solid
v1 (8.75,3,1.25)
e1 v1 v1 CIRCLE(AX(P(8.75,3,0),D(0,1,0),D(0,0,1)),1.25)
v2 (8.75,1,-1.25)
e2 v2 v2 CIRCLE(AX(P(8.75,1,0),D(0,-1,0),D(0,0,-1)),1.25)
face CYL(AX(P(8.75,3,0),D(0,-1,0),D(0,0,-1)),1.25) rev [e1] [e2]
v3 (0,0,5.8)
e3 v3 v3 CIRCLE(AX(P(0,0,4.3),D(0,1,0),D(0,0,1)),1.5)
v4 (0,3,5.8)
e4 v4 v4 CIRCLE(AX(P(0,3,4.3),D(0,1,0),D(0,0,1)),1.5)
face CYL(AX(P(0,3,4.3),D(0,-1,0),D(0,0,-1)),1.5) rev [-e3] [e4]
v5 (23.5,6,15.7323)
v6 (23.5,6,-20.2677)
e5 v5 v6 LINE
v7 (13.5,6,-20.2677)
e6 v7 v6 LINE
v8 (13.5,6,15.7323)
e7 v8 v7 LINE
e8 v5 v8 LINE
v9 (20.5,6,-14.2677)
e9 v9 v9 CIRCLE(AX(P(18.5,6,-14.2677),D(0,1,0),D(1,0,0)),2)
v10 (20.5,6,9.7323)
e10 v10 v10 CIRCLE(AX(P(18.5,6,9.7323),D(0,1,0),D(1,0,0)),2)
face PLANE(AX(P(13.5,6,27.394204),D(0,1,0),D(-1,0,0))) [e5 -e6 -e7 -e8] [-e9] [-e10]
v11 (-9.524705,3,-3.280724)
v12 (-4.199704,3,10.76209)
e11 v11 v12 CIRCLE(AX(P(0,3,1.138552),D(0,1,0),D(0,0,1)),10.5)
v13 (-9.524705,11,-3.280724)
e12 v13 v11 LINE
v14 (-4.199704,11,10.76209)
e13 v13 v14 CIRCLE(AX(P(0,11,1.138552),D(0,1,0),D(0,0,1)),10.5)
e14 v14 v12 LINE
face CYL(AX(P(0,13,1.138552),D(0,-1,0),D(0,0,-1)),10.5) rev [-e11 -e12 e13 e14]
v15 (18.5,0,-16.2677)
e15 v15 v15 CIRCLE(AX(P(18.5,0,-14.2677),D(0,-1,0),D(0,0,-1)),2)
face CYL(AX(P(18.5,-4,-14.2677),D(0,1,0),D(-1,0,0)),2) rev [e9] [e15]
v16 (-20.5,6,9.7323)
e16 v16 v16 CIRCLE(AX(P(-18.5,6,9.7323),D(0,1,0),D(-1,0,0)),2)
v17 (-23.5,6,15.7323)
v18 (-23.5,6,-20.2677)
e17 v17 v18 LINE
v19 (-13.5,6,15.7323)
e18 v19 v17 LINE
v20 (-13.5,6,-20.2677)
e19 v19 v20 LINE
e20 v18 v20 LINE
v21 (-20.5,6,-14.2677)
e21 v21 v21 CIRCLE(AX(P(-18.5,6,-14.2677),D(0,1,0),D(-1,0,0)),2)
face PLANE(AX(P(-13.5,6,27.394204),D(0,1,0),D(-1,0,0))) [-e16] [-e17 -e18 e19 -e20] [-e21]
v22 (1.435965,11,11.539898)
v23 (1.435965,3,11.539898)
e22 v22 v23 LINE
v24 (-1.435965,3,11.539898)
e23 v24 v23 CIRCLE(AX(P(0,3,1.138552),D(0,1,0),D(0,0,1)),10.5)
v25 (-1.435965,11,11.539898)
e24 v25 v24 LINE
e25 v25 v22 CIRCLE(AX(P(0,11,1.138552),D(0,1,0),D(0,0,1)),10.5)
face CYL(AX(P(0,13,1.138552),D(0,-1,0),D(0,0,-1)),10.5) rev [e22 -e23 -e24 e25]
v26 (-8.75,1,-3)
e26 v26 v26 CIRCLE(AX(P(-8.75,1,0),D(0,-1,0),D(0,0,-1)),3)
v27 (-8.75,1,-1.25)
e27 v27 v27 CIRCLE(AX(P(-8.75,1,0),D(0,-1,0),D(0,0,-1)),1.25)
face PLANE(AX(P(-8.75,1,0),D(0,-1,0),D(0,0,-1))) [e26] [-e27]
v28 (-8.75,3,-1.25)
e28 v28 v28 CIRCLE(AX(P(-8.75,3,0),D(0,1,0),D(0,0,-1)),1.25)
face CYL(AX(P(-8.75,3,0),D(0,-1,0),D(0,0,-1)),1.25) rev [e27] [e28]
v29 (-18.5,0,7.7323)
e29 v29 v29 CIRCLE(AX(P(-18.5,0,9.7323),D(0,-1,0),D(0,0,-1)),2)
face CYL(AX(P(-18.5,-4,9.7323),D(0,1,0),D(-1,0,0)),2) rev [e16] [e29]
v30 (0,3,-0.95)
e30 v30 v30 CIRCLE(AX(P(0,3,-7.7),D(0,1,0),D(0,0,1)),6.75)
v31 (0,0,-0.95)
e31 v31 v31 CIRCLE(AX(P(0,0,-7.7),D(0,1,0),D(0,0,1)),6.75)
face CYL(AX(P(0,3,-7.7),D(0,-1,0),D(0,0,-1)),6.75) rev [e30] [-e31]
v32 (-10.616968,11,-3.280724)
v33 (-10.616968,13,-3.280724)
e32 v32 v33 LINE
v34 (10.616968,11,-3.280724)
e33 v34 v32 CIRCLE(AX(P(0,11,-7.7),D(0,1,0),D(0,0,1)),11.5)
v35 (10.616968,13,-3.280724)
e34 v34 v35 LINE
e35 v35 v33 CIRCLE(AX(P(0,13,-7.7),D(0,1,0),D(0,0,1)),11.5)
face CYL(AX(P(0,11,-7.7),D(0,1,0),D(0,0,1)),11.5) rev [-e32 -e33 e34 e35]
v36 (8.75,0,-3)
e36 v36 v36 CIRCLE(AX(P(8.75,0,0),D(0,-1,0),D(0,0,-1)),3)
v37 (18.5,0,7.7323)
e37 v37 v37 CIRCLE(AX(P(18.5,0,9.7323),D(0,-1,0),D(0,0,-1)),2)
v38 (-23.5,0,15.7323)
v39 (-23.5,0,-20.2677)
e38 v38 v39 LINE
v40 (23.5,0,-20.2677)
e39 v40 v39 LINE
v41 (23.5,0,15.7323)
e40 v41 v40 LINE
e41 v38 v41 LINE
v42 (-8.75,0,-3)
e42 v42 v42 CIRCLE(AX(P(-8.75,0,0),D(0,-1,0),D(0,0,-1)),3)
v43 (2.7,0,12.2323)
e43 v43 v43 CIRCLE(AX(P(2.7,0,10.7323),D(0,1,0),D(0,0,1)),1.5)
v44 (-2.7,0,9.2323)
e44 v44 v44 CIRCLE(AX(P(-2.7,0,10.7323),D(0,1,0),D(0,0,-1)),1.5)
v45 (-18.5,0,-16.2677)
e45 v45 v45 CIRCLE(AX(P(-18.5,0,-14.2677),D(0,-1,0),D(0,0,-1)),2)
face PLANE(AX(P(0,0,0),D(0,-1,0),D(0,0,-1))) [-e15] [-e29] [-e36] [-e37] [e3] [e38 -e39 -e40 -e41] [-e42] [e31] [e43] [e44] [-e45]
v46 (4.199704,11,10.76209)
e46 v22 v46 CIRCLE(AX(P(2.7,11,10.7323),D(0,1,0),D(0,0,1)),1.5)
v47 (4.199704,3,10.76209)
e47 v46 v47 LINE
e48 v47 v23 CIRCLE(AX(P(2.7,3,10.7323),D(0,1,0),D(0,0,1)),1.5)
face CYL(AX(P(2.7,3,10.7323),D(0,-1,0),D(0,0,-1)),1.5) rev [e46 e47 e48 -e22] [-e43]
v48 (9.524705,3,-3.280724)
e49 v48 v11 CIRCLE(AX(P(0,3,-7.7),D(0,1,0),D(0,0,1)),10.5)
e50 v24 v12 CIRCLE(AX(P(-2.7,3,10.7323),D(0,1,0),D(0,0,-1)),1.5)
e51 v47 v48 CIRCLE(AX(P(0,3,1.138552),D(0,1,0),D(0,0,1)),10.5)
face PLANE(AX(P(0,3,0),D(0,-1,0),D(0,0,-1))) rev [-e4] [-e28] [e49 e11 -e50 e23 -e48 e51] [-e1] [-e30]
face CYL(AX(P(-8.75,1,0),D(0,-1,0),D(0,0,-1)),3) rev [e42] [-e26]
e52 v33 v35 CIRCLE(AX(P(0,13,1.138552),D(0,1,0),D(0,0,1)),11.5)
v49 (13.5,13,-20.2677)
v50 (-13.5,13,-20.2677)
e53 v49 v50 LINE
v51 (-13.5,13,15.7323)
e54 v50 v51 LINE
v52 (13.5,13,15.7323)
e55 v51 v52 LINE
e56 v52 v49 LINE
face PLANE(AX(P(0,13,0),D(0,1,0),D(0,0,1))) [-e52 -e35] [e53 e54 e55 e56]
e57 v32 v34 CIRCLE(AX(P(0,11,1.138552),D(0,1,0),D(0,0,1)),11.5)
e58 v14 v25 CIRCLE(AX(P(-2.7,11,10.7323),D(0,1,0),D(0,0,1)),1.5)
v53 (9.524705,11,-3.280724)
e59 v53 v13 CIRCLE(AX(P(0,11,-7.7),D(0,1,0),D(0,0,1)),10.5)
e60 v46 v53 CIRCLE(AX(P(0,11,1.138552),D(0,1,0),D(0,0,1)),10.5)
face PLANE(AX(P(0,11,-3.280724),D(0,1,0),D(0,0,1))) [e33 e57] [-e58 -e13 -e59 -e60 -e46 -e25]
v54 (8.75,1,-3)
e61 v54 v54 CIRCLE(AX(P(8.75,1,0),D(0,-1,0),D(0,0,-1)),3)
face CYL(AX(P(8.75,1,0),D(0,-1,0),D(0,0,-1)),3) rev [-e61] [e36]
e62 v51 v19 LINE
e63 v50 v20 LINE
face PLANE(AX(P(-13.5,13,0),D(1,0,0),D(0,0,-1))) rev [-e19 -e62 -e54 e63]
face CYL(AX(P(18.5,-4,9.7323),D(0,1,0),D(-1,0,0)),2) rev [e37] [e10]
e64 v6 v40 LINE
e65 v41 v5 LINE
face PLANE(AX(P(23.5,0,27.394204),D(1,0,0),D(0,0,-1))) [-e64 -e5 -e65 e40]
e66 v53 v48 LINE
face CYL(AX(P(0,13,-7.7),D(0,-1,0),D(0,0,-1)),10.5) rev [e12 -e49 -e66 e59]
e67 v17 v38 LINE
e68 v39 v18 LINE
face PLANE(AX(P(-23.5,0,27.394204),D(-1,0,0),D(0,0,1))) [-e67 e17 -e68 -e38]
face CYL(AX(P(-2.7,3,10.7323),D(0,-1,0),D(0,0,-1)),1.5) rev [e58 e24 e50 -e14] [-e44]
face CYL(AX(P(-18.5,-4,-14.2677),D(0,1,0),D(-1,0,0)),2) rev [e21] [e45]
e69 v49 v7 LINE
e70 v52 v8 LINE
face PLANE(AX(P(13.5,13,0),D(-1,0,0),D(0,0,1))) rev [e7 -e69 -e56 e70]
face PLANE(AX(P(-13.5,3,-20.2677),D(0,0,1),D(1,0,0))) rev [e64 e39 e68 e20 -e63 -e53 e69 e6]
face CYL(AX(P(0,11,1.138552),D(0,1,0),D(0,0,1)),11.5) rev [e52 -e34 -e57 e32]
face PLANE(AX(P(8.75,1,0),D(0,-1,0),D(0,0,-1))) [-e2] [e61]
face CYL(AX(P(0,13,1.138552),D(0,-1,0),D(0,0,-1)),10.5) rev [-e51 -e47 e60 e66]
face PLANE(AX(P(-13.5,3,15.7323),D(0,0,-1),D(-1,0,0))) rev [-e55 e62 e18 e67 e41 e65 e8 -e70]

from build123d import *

# Parameters (mm, degrees)
SKETCH_1_W          = 27
SKETCH_1_H          = 36
SKETCH_1_R          = 6.75
SKETCH_1_R_2        = 1.5
SKETCH_1_R_3        = 1.25
EXTRUDE_1_DEPTH     = 3
SKETCH_4_W          = 10
SKETCH_4_H          = 6
EXTRUDE_3_DEPTH     = 36
SKETCH_6_R          = 3
CUT_EXTRUDE_3_DEPTH = 1
EXTRUDE_4_OUTLINE_W = 27
EXTRUDE_4_OUTLINE_H = 36
EXTRUDE_4_DEPTH     = 10
CUT_EXTRUDE_START   = 10
CUT_EXTRUDE_5_DEPTH = 2
SKETCH_13_R         = 2
CUT_EXTRUDE_6_DEPTH = 10


# Read off the part's stored shape, not the designer's step: 凸台-拉伸4
with BuildPart() as part:
    # 草图1 → 凸台-拉伸1 (new body)
    with BuildSketch(Plane(origin=(0, 0, 0), x_dir=(1, 0, 0), z_dir=(0, 1, 0))):
        with Locations((0, 2.267700118)):
            Rectangle(SKETCH_1_W, SKETCH_1_H)
        with Locations(Location((0, 7.7, 0), (0, 0, 270))):
            Circle(SKETCH_1_R, mode=Mode.SUBTRACT)
        with Locations(Location((0, -4.3, 0), (0, 0, 270))):
            Circle(SKETCH_1_R_2, mode=Mode.SUBTRACT)
        with Locations(Location((-8.75, 0, 0), (0, 0, 90))):
            Circle(SKETCH_1_R_3, mode=Mode.SUBTRACT)
        with Locations(Location((-2.7, -10.732299882, 0), (0, 0, 90))):
            Circle(SKETCH_1_R_2, mode=Mode.SUBTRACT)
        with Locations(Location((8.75, 0, 0), (0, 0, 270))):
            Circle(SKETCH_1_R_3, mode=Mode.SUBTRACT)
        with Locations(Location((2.7, -10.732299882, 0), (0, 0, 270))):
            Circle(SKETCH_1_R_2, mode=Mode.SUBTRACT)
    extrude(amount=EXTRUDE_1_DEPTH)

    # 草图4 → 凸台-拉伸3 (add)
    with BuildSketch(Plane(origin=(0, 0, -20.267700118), x_dir=(-1, 0, 0), z_dir=(0, 0, -1))):
        with Locations((-18.5, 3)):
            Rectangle(SKETCH_4_W, SKETCH_4_H)
        with Locations((18.5, 3)):
            Rectangle(SKETCH_4_W, SKETCH_4_H)
    extrude(amount=-EXTRUDE_3_DEPTH)

    # 草图6 → 切除-拉伸3 (cut)
    with BuildSketch(Plane.XZ):
        with Locations(Location((-8.75, 0, 0), (0, 0, 270))):
            Circle(SKETCH_6_R)
        with Locations(Location((8.75, 0, 0), (0, 0, 270))):
            Circle(SKETCH_6_R)
    extrude(amount=-CUT_EXTRUDE_3_DEPTH, mode=Mode.SUBTRACT)

    # 凸台-拉伸4 outline → 凸台-拉伸4 (add)
    with BuildSketch(Plane(origin=(0, 3, 0), x_dir=(1, 0, 0), z_dir=(0, 1, 0))):
        with Locations((0, 2.267700118)):
            Rectangle(EXTRUDE_4_OUTLINE_W, EXTRUDE_4_OUTLINE_H)
        with BuildLine():
            ThreePointArc((-1.435964828, -11.539898225), (-3.106363606, -12.176207296), (-4.199704154, -10.762089989))
            ThreePointArc((-4.199704154, -10.762089989), (-9.817841219, -4.861453177), (-9.52470472, 3.280724041))
            ThreePointArc((-9.52470472, 3.280724041), (0, 18.2), (9.52470472, 3.280724041))
            ThreePointArc((9.52470472, 3.280724041), (9.817841219, -4.861453177), (4.199704154, -10.762089989))
            ThreePointArc((4.199704154, -10.762089989), (3.106363606, -12.176207296), (1.435964828, -11.539898225))
            ThreePointArc((1.435964828, -11.539898225), (0, -11.638551918), (-1.435964828, -11.539898225))
        make_face(mode=Mode.SUBTRACT)
    extrude(amount=EXTRUDE_4_DEPTH)

    # 草图9 → 切除-拉伸5 (cut)
    with BuildSketch(Plane(origin=(0, 3, 0), x_dir=(1, 0, 0), z_dir=(0, 1, 0)).offset(CUT_EXTRUDE_START)):
        with BuildLine():
            ThreePointArc((10.616967552, 3.280724041), (0, 19.2), (-10.616967552, 3.280724041))
            ThreePointArc((-10.616967552, 3.280724041), (0, -12.638551918), (10.616967552, 3.280724041))
        make_face()
    extrude(amount=-CUT_EXTRUDE_5_DEPTH, mode=Mode.SUBTRACT)

    # 草图13 → 切除-拉伸6 (cut)
    with BuildSketch(Plane(origin=(0, 6, 0), x_dir=(1, 0, 0), z_dir=(0, 1, 0))):
        with Locations(Location((-18.5, 14.267700118, 0), (0, 0, 180))):
            Circle(SKETCH_13_R)
        with Locations(Location((-18.5, -9.732299882, 0), (0, 0, 180))):
            Circle(SKETCH_13_R)
        with Locations(Location((18.5, -9.732299882, 0), (0, 0, 90))):
            Circle(SKETCH_13_R)
        with Locations(Location((18.5, 14.267700118, 0), (0, 0, 90))):
            Circle(SKETCH_13_R)
    extrude(amount=-CUT_EXTRUDE_6_DEPTH, mode=Mode.SUBTRACT)


solid = part.part
